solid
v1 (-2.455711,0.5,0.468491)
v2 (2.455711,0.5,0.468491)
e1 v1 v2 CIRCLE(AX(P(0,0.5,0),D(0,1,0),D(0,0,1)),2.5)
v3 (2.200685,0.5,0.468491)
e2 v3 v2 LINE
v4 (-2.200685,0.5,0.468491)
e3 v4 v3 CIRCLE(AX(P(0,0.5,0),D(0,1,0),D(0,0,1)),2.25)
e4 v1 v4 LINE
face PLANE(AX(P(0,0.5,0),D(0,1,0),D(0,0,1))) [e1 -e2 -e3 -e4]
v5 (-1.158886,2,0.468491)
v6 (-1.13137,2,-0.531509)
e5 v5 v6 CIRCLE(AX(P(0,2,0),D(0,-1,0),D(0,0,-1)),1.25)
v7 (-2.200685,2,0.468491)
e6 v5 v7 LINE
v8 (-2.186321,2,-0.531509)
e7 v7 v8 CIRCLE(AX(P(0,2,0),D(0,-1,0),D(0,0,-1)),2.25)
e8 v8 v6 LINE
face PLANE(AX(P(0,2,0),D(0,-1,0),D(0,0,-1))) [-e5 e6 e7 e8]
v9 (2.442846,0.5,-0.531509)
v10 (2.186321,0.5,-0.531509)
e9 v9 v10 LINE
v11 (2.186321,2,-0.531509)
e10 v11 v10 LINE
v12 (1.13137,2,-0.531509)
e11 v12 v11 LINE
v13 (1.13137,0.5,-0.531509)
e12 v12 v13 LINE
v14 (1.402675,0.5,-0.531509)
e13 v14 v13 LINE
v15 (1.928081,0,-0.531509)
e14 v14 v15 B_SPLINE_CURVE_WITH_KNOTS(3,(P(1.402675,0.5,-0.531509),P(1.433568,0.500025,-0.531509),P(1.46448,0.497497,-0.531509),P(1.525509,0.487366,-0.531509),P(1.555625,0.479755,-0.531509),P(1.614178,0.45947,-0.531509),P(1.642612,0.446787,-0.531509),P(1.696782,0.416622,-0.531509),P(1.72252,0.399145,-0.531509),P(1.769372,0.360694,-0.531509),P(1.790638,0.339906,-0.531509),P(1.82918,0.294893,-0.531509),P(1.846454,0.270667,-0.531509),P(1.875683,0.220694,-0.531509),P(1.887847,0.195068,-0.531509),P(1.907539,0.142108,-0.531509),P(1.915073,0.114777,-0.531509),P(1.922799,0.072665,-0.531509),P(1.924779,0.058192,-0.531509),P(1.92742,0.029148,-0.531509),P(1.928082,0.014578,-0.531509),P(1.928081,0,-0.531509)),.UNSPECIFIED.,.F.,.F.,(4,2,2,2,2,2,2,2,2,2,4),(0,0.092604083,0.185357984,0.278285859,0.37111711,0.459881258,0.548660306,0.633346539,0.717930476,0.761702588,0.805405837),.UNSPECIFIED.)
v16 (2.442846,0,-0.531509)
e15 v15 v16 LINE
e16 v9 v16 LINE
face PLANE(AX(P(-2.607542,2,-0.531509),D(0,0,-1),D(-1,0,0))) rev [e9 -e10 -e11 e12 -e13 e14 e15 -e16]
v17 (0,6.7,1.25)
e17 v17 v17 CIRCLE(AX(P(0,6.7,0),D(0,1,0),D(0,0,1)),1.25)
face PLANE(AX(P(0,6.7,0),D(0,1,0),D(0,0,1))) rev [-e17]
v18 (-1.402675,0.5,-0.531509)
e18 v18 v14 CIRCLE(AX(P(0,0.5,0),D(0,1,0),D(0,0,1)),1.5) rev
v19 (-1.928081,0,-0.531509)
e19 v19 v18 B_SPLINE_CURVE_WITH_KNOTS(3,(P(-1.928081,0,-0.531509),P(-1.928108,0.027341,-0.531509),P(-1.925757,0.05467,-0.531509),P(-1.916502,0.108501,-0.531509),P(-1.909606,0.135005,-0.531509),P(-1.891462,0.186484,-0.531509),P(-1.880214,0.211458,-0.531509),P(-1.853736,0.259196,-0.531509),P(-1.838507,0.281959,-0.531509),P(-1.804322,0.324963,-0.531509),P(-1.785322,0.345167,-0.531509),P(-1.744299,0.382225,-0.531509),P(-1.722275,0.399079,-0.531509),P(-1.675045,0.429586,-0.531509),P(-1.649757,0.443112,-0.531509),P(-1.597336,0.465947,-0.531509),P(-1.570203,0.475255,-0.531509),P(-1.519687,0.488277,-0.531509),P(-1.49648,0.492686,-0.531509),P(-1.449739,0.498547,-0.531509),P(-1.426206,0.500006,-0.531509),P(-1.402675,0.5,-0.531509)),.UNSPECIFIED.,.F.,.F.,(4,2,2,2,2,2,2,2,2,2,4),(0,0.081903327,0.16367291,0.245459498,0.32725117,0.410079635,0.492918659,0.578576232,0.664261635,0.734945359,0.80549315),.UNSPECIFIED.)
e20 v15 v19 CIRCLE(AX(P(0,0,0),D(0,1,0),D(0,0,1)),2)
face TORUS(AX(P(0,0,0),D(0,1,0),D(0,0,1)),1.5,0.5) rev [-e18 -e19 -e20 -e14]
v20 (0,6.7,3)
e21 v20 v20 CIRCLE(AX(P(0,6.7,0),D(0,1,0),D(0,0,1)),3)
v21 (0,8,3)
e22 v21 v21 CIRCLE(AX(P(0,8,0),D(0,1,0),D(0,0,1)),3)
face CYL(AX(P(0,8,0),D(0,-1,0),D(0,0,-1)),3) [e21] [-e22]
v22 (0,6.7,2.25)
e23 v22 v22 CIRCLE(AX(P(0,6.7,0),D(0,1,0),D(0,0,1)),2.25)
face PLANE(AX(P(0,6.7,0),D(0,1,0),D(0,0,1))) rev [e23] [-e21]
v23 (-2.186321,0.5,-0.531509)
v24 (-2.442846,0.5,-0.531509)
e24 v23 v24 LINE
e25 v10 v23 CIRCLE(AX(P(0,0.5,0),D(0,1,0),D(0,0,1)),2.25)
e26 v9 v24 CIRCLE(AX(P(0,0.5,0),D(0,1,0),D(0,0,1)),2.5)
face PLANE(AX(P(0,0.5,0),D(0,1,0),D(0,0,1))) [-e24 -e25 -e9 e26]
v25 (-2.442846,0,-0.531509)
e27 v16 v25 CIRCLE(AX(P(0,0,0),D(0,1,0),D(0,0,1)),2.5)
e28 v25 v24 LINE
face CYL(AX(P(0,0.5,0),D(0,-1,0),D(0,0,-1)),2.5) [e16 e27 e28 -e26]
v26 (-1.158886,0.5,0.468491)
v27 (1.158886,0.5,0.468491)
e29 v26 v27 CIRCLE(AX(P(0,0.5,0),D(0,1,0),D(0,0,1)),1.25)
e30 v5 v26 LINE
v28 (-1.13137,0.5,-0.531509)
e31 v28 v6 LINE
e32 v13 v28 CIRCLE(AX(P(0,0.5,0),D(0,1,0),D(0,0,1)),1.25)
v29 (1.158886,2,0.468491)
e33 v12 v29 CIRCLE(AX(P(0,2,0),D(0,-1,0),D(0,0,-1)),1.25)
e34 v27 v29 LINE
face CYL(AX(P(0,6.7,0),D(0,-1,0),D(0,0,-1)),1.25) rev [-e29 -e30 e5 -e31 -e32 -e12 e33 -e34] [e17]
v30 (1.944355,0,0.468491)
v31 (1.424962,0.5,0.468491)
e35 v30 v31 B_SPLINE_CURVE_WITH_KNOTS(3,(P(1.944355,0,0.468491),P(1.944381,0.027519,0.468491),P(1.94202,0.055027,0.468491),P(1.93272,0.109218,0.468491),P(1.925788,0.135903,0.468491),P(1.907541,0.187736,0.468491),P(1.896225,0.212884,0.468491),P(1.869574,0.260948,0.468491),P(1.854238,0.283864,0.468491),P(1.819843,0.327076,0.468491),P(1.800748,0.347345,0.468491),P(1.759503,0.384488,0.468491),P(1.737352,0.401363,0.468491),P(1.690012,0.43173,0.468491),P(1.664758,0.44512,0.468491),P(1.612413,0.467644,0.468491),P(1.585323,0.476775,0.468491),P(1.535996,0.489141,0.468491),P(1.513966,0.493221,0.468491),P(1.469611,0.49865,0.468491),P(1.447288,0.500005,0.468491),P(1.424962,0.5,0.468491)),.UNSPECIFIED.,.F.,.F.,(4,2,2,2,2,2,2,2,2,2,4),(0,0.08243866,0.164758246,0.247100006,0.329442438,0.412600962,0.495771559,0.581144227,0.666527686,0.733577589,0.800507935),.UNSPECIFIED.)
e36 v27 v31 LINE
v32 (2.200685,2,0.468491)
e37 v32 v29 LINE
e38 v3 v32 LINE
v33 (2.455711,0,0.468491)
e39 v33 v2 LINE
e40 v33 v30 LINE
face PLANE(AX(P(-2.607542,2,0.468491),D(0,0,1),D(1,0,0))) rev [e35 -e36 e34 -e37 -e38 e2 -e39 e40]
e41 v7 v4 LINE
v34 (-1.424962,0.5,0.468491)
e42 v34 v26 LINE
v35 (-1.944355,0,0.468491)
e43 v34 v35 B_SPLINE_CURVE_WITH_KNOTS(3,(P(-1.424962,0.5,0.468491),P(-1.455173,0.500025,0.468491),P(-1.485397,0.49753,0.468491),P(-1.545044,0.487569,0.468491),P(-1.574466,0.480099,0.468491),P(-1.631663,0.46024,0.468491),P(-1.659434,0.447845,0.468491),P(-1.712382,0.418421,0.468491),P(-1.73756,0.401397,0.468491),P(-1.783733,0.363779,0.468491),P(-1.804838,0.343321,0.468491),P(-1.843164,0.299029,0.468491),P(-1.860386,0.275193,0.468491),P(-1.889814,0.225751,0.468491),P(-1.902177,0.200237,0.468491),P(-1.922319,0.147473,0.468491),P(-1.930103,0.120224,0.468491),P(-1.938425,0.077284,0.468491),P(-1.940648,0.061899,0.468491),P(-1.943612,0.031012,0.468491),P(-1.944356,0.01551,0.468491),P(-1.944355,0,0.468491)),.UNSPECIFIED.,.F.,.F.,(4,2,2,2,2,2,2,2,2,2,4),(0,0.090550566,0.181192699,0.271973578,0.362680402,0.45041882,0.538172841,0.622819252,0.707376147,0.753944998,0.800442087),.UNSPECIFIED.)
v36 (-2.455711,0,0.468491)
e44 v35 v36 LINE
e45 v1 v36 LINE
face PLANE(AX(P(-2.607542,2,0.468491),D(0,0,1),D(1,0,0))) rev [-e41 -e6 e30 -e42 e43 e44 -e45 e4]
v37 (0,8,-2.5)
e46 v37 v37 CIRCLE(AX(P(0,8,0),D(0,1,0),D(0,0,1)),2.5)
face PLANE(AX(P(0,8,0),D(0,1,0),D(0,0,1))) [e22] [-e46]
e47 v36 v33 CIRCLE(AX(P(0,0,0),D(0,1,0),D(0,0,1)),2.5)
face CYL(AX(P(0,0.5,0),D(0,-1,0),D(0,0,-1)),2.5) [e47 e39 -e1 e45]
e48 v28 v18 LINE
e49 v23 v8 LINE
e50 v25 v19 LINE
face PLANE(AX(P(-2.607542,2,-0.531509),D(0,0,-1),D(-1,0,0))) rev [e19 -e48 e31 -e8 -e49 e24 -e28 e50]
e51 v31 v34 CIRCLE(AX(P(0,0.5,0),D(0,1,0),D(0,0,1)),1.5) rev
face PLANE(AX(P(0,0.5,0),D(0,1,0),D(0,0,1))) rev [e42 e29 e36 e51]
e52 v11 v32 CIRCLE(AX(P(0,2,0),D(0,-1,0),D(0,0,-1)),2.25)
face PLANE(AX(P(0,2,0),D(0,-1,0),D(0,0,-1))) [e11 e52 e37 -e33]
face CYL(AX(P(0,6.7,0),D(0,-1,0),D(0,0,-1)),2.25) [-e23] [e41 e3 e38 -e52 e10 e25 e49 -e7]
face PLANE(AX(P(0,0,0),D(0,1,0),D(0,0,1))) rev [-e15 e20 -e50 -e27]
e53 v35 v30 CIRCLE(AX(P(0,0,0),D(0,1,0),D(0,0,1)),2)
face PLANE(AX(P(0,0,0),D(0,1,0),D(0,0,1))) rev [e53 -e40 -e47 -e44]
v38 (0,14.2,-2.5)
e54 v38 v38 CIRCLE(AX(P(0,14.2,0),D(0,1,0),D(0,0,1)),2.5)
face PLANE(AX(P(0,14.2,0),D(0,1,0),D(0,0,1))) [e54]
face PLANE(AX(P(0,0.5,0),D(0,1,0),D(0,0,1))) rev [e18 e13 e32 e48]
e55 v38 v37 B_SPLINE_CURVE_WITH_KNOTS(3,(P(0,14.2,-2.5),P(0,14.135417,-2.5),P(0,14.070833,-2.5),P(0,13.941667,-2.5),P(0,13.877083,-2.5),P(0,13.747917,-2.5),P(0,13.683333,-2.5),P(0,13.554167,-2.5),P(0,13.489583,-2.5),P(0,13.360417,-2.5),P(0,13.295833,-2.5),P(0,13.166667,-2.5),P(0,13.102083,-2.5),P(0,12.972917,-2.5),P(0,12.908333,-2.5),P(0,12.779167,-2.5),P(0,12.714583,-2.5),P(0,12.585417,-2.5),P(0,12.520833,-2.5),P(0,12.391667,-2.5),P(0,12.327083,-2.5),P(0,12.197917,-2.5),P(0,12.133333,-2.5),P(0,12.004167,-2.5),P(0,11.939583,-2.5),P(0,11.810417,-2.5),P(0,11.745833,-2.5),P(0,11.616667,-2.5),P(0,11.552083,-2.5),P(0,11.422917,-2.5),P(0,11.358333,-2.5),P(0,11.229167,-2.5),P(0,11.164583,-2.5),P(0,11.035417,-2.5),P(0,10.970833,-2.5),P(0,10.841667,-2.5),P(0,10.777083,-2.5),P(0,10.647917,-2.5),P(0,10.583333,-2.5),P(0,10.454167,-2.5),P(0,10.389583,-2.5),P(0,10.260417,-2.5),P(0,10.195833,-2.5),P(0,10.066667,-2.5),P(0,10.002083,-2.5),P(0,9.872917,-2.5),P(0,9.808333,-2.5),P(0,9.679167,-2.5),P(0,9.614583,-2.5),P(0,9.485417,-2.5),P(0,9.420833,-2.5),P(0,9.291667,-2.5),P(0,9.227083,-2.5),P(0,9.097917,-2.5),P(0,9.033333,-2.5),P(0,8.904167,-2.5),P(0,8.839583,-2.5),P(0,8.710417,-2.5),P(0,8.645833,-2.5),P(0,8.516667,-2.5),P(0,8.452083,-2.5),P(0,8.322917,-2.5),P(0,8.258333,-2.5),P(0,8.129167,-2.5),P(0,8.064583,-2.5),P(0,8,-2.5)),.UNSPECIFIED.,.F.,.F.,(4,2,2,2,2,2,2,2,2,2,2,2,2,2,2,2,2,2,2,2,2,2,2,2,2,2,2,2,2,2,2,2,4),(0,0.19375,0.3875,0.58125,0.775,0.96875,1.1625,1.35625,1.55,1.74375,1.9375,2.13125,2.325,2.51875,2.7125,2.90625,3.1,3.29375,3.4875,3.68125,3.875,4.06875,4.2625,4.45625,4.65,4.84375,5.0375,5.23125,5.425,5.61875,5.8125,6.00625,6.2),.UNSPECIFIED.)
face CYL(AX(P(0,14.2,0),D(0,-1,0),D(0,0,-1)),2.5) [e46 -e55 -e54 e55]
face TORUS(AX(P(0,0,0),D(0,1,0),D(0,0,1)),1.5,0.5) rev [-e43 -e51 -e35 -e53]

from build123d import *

# Parameters (mm, degrees)
SKETCH1_R           = 2.5
SKETCH1_R_2         = 2
BOSS_EXTRUDE1_DEPTH = 0.5
SKETCH3_R           = 2.25
SKETCH3_R_2         = 1.25
BOSS_EXTRUDE2_DEPTH = 6.2
SKETCH5_R           = 3
BOSS_EXTRUDE3_DEPTH = 1.3
SKETCH6_R           = 2.5
BOSS_EXTRUDE4_DEPTH = 6.2
SKETCH24_W          = 5.284246403
SKETCH24_H          = 1
CUT_EXTRUDE1_DEPTH  = 2
FILLET1_R           = 0.5


with BuildPart() as part:
    # Sketch1 → Boss-Extrude1 (new body)
    with BuildSketch(Plane(origin=(0, 0, 0), x_dir=(1, 0, 0), z_dir=(0, 1, 0))):
        with Locations(Location((0, 0, 0), (0, 0, 270))):
            Circle(SKETCH1_R)
        with Locations(Location((0, 0, 0), (0, 0, 270))):
            Circle(SKETCH1_R_2, mode=Mode.SUBTRACT)
    extrude(amount=BOSS_EXTRUDE1_DEPTH)

    # Sketch3 → Boss-Extrude2 (add)
    with BuildSketch(Plane(origin=(0, 0.5, 0), x_dir=(1, 0, 0), z_dir=(0, 1, 0))):
        with Locations(Location((0, 0, 0), (0, 0, 90))):
            Circle(SKETCH3_R)
        with Locations(Location((0, 0, 0), (0, 0, 90))):
            Circle(SKETCH3_R_2, mode=Mode.SUBTRACT)
    extrude(amount=BOSS_EXTRUDE2_DEPTH)

    # Sketch5 → Boss-Extrude3 (add)
    with BuildSketch(Plane(origin=(0, 6.7, 0), x_dir=(1, 0, 0), z_dir=(0, 1, 0))):
        with Locations(Location((0, 0, 0), (0, 0, 270))):
            Circle(SKETCH5_R)
    extrude(amount=BOSS_EXTRUDE3_DEPTH)

    # Sketch6 → Boss-Extrude4 (add)
    with BuildSketch(Plane(origin=(0, 8, 0), x_dir=(1, 0, 0), z_dir=(0, 1, 0))):
        with Locations(Location((0, 0, 0), (0, 0, 270))):
            Circle(SKETCH6_R)
    extrude(amount=BOSS_EXTRUDE4_DEPTH)

    # Sketch24 → Cut-Extrude1 (cut)
    with BuildSketch(Plane(origin=(0, 0, 0), x_dir=(-1, 0, 0), z_dir=(0, -1, 0))):
        with Locations((-0.034581621, 0.031508974)):
            Rectangle(SKETCH24_W, SKETCH24_H)
    extrude(amount=-CUT_EXTRUDE1_DEPTH, mode=Mode.SUBTRACT)

    # Fillet1
    fillet1_edges = [part.edges().sort_by_distance(p)[0] for p in [
        (0, 0.5, 2),
        (0, 0.5, -2),
    ]]
    fillet(fillet1_edges, radius=FILLET1_R - 0.0001)  # a hair under: the kernel refuses the full size


solid = part.part
